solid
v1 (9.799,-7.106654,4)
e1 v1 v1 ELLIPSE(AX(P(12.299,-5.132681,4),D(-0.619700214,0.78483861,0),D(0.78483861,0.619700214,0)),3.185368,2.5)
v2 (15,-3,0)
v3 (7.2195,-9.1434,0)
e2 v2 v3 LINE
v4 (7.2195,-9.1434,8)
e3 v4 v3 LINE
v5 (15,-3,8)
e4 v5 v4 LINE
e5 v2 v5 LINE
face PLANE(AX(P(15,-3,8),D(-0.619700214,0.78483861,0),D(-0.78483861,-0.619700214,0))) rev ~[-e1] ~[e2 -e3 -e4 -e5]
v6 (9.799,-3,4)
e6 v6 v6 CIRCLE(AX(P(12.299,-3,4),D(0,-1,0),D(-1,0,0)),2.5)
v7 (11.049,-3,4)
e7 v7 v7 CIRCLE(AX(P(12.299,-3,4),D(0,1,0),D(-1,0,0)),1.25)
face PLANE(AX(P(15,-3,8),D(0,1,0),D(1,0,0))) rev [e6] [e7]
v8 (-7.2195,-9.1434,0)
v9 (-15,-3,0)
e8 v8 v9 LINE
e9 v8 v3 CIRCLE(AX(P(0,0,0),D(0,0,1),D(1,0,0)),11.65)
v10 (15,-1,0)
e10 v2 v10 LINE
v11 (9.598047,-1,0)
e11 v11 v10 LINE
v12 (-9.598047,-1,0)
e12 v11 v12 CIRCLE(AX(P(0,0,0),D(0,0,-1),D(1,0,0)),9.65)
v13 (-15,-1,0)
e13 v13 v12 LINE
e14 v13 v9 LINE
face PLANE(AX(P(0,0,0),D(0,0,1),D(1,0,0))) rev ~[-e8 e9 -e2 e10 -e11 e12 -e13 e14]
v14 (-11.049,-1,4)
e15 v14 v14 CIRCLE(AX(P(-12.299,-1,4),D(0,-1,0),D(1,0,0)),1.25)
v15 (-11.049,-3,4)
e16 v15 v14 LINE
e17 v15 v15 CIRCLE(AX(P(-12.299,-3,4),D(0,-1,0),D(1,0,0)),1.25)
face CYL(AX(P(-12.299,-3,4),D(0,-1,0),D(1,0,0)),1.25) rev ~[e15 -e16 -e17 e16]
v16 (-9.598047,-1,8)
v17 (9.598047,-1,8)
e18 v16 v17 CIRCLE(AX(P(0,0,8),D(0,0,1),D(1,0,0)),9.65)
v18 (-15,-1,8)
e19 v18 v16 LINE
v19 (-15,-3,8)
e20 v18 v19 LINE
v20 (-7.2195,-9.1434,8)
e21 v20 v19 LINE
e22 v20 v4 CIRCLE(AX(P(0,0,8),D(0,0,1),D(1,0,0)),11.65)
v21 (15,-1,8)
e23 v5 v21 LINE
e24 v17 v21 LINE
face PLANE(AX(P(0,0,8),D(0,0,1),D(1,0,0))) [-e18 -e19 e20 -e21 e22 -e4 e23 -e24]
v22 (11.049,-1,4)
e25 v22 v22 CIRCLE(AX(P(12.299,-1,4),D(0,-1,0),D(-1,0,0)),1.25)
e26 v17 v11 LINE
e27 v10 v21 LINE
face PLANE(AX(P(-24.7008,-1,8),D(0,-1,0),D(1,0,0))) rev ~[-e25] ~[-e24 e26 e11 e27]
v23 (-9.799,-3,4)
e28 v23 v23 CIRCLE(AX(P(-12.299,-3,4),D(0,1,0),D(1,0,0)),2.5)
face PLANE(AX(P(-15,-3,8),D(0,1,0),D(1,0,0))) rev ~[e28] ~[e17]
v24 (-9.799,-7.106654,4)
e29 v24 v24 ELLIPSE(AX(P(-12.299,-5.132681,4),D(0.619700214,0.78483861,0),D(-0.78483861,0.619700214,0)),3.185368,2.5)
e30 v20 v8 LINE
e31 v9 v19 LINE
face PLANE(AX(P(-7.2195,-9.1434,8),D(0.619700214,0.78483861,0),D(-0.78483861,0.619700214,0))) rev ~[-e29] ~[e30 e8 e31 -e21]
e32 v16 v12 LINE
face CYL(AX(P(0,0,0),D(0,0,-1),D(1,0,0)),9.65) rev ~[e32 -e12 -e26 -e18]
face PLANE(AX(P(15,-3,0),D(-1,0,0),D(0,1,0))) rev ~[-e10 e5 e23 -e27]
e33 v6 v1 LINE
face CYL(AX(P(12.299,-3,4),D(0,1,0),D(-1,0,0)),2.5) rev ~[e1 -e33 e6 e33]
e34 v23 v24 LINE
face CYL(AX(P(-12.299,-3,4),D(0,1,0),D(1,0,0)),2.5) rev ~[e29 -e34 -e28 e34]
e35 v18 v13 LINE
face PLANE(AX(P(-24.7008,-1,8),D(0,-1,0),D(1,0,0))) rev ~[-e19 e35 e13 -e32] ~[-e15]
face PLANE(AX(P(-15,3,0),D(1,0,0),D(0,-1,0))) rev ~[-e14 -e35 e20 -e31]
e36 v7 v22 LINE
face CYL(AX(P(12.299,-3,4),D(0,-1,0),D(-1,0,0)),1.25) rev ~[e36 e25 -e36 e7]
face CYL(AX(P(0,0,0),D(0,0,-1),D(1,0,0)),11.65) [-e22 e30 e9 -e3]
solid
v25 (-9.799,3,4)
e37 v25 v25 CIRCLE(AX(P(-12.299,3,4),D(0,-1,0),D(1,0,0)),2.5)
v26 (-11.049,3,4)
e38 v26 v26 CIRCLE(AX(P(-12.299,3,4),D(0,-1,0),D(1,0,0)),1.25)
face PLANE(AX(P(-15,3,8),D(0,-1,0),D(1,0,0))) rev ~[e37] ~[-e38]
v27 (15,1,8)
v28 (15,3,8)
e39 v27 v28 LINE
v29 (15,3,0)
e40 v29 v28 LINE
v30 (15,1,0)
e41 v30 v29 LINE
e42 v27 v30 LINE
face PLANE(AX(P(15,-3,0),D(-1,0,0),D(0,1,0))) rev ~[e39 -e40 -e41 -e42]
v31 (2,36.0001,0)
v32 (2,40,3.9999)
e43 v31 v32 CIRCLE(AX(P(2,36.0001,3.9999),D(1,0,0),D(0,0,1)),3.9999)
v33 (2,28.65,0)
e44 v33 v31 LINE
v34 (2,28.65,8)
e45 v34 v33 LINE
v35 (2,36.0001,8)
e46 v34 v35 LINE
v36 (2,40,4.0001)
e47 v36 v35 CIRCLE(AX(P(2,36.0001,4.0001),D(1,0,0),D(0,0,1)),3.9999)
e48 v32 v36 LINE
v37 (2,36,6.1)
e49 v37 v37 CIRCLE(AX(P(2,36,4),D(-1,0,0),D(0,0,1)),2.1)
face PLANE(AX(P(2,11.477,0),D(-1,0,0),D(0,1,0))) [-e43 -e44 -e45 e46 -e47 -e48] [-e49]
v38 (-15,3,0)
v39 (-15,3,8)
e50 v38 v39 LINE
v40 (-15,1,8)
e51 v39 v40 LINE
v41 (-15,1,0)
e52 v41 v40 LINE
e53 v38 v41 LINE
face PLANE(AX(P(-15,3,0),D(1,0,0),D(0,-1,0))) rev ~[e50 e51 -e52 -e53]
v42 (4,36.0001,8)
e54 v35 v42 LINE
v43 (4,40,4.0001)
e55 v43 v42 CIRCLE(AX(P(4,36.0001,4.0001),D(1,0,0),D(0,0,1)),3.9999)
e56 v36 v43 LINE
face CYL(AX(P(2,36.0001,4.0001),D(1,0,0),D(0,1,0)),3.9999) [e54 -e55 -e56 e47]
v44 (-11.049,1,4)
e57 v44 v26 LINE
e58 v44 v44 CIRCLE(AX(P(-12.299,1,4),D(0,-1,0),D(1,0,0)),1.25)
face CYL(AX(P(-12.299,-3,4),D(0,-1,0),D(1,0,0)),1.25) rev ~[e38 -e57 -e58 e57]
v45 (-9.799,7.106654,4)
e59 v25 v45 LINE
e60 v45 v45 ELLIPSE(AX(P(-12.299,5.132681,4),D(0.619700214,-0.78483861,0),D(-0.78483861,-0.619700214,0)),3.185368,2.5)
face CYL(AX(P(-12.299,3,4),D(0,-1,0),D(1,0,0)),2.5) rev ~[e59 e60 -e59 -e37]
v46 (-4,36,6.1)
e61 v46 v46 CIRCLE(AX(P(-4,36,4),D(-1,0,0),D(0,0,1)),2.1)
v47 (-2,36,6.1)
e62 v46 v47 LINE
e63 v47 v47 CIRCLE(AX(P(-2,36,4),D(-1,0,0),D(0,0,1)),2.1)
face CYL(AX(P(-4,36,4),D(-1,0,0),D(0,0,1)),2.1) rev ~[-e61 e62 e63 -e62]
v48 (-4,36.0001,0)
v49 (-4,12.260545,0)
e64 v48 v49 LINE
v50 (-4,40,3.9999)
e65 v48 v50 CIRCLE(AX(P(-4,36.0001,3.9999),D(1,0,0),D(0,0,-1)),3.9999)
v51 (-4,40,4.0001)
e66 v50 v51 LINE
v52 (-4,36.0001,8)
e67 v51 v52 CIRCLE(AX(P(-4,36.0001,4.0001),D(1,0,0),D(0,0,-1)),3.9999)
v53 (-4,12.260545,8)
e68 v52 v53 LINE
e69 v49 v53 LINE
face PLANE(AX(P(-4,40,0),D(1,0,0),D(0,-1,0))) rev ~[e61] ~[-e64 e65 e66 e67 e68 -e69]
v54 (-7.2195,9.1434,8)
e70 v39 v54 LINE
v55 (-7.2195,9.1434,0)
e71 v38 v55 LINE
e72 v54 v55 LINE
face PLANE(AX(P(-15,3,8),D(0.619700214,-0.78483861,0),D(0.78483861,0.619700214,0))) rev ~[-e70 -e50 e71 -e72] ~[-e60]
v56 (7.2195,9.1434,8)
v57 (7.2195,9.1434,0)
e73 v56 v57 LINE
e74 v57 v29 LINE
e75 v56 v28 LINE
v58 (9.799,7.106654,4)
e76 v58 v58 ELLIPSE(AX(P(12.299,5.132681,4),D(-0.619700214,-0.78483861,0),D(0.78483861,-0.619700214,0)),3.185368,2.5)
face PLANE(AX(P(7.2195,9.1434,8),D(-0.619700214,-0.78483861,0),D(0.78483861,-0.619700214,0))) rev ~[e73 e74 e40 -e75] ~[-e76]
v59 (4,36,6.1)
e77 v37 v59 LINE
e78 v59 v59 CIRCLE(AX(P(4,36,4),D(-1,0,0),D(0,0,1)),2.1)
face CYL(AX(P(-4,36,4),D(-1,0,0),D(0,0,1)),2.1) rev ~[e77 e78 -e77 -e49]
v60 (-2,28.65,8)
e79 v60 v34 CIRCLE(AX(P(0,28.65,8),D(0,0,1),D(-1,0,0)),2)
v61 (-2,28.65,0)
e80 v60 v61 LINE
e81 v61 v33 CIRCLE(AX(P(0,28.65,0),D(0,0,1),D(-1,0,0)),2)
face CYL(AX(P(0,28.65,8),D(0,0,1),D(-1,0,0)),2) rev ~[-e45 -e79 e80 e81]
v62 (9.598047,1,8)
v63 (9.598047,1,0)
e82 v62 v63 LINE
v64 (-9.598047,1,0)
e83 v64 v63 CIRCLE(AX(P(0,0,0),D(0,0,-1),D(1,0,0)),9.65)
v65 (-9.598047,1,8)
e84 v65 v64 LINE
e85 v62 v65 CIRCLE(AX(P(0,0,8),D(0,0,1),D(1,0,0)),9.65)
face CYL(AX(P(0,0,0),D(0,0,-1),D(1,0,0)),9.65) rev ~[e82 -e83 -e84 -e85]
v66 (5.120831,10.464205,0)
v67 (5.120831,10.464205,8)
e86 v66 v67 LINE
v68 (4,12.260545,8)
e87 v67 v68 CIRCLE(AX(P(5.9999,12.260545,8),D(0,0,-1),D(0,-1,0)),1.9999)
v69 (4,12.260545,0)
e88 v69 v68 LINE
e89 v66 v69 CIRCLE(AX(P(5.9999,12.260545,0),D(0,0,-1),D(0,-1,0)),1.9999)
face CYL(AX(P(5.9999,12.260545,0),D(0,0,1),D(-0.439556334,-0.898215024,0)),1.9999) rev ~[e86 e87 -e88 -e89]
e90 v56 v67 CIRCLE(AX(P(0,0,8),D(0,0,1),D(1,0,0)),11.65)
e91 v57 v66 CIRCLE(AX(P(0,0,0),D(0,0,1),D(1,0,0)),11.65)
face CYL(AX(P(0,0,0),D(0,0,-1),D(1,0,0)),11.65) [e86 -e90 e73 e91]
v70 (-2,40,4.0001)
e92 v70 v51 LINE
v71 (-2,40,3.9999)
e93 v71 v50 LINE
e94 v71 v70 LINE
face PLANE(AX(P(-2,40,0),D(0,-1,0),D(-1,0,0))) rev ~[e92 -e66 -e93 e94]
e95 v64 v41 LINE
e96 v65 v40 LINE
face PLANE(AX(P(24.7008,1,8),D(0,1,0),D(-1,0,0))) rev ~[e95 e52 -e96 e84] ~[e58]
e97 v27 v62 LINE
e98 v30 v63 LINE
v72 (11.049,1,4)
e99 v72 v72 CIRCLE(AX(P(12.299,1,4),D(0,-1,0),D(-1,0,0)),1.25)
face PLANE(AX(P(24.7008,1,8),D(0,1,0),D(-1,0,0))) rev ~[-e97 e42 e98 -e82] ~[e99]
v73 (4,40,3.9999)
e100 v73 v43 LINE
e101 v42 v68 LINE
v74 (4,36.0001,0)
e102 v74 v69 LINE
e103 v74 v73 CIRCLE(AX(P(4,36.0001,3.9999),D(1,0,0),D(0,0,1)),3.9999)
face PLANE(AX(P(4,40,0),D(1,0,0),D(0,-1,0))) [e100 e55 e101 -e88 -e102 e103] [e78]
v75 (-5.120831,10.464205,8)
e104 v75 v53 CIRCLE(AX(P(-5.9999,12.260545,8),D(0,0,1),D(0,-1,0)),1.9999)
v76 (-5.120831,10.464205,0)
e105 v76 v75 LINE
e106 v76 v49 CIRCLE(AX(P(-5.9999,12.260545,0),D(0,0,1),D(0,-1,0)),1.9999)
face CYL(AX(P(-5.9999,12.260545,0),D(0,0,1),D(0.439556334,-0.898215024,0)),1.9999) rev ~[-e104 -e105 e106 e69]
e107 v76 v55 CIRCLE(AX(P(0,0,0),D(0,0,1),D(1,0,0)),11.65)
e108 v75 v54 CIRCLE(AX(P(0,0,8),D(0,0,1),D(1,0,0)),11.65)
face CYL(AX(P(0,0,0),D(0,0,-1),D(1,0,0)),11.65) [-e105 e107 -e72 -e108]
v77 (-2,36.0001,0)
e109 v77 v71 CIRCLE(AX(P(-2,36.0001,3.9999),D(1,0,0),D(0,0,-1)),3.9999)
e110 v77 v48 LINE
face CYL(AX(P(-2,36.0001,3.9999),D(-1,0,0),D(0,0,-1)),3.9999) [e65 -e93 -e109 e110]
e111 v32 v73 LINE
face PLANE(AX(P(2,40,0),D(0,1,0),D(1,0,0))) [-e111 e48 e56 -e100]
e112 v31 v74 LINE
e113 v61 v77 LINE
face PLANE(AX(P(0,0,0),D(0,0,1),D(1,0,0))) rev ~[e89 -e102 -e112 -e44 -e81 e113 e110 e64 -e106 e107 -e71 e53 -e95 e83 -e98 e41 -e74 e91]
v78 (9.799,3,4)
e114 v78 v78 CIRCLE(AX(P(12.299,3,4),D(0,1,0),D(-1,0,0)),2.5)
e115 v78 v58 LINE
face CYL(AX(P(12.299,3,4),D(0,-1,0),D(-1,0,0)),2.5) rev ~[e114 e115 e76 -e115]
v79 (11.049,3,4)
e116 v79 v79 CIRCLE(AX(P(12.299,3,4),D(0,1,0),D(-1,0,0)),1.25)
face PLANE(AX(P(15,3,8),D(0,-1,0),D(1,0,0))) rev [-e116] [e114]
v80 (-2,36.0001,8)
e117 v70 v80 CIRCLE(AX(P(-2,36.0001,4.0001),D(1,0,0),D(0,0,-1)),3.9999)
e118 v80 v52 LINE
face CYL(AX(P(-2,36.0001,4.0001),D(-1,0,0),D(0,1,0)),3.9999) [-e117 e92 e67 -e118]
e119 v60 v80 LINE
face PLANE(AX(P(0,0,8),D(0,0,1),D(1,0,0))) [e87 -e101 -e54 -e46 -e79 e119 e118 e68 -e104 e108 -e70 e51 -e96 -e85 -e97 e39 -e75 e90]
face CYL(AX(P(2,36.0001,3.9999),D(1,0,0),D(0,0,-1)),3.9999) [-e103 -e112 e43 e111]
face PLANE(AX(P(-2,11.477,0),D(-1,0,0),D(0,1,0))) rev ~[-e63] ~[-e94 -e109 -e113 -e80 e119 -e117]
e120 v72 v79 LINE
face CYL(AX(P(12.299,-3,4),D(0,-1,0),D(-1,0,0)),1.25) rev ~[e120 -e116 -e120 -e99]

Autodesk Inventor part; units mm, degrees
ref_plane "YZ Plane" through (0, 0, 0) normal (1, 0, 0) x (0, 1, 0)
sketch "Sketch1" plane through (0, 0, 0) normal (0, 0, 1) x (1, 0, 0)
  circle A0 centre (0, 0) radius 9.65
  circle A1 centre (0, 0) radius 11.65
  line L0 (15, -3) -> (15, 3)
  line L1 (-15, 3) -> (-15, -3)
  line L2 (-15, -3) -> (15, 3) construction
  line L3 (15, -3) -> (-15, 3) construction
  line L4 (-15, -3) -> (-9.1718, -3)
  line L5 (9.1718, -3) -> (15, -3)
  line L6 (15, 3) -> (9.1718, 3)
  line L7 (-9.1718, 3) -> (-15, 3)
  dimension "d0" = 19.3
  dimension "d1" = 2
  dimension "d2" = 30
  dimension "d3" = 6
extrude "Extrusion1" add sketch "Sketch1" along normal blind 8 contours A0 L6 A1 L5 | A0 L7 A1 L6 | L5 A1 L4 A0 | A0 L4 A1 L7 | L6 L0 L5 A1 | A1 L4 L1 L7
sketch "Sketch2" plane through (0, 0, 8) normal (0, 0, 1) x (1, 0, 0)
  line L0 (-15, 3) -> (-15, -3) projected
  line L1 (-15, 3) -> (-7.2195, 9.1434)
  line L2 (15, 3) -> (11.2571, 3) projected
  line L3 (7.2195, 9.1434) -> (15, 3)
  line L4 (-15, -3) -> (-11.2571, -3) projected
  line L5 (-7.2195, -9.1434) -> (-15, -3)
  arc A0 (11.2571, 3) -> (-11.2571, 3) centre (0, 0) ccw projected
  arc A1 (-11.2571, -3) -> (11.2571, -3) centre (0, 0) ccw projected
  line L6 (11.2571, -3) -> (15, -3) projected
  line L7 (15, -3) -> (7.2195, -9.1434)
  line L8 (-11.2571, 3) -> (-15, 3) projected
extrude "Extrusion2" add sketch "Sketch2" against normal blind 8
sketch "Sketch3" plane through (0, 0, 8) normal (0, 0, 1) x (1, 0, 0)
  line L0 (-24.7008, -1) -> (24.7008, -1)
  line L1 (24.7008, -1) -> (24.7008, 1)
  line L2 (24.7008, 1) -> (-24.7008, 1)
  line L3 (-24.7008, 1) -> (-24.7008, -1)
  line L4 (-24.7008, -1) -> (24.7008, 1) construction
  line L5 (24.7008, -1) -> (-24.7008, 1) construction
  point P0 (0, 0)
  dimension "d8" = 2
extrude "Extrusion3" cut sketch "Sketch3" against normal through all
sketch "Sketch4" plane through (0, 0, 0) normal (0, 0, -1) x (-1, 0, 0)
  line L0 (-4, 0) -> (-2, 0)
  line L1 (-2, 11.477) -> (-2, 40)
  line L2 (-2, 40) -> (-4, 40)
  line L3 (-4, 40) -> (-4, 10.9418)
  line L4 (2, 40) -> (4, 40)
  line L5 (4, 40) -> (4, 10.9418)
  line L6 (4, 0) -> (2, 0)
  line L7 (2, 11.477) -> (2, 40)
  arc A0 (7.2195, 9.1434) -> (-7.2195, 9.1434) centre (0, 0) ccw projected
  point P0 (-3, 0)
  dimension "d11" = 2
  dimension "d12" = 2
  dimension "d13" = 4
  dimension "d14" = 2
  dimension "d15" = 40
extrude "Extrusion4" add sketch "Sketch4" against normal blind 8
fillet "Fillet1" radius 2 4 edges at (-4, 10.9418, 4) (-2, 11.477, 4) (2, 11.477, 4) (4, 10.9418, 4)
fillet "Fillet2" radius 4 4 edges at (-3, 40, 0) (3, 40, 0) (3, 40, 8) (-3, 40, 8)
ref_plane "Work Plane1" through (-15, -3, 8) normal (0, 1, 0) x (1, 0, 0)
sketch "Sketch5" plane through (-15, -3, 8) normal (0, 1, 0) x (1, 0, 0)
  line L0 (0, 8) -> (5.402, 8) projected
  line L1 (0, 0) -> (0, 8) projected
  circle A0 centre (2.701, 4) radius 2.5
  point P0 (15, 8)
  dimension "d21" = 5
extrude "Extrusion5" cut sketch "Sketch5" against normal blind 8
sketch "Sketch6" plane through (-12.299, -3, 4) normal (0, -1, 0) x (1, 0, 0)
  circle A0 centre (0, 0) radius 1.25
  point P0 (12.299, -4)
  dimension "d24" = 2.5
extrude "Extrusion6" cut sketch "Sketch6" against normal blind 12
ref_plane "Work Plane2" through (-15, 3, 8) normal (0, -1, 0) x (1, 0, 0)
sketch "Sketch7" plane through (-15, 3, 8) normal (0, -1, 0) x (1, 0, 0)
  circle A0 centre (2.701, -4) radius 1.25 projected
  circle A1 centre (2.701, -4) radius 2.5 projected
  point P0 (15, -8)
extrude "Extrusion7" cut sketch "Sketch7" against normal blind 12
mirror "Mirror1" about plane through (0, 0, 0) normal (1, 0, 0) of "Extrusion7", "Extrusion6", "Extrusion5"
sketch "Sketch8" plane through (-4, 12.2606, 0) normal (-1, 0, 0) x (0, 0, 1)
  arc A0 (8, 23.7394) -> (0, 23.7394) centre (4, 23.7394) ccw projected
  line L0 (0, 0) -> (0, 23.7394) projected
  line L1 (8, 0) -> (0, 0) projected
  line L2 (8, 23.7394) -> (8, 0) projected
  circle A1 centre (4, 23.7394) radius 2.1
  point P0 (0, -12.2606)
  dimension "d30" = 4.2
extrude "Extrusion8" cut sketch "Sketch8" against normal through all contours A1
sketch "Sketch9" plane through (0, 0, 8) normal (0, 0, 1) x (1, 0, 0)
  line L0 (-4, 36) -> (-2, 36) projected
  line L1 (-4, 36) -> (-4, 12.2606) projected
  arc A0 (-5.1209, 10.4642) -> (-4, 12.2606) centre (-6, 12.2606) ccw projected
  arc A1 (-5.1209, 10.4642) -> (-7.2195, 9.1434) centre (0, 0) ccw projected
  line L2 (-7.2195, 9.1434) -> (-15, 3) projected
  line L3 (-15, 3) -> (-15, 1) projected
  line L4 (-15, 1) -> (-9.598, 1) projected
  arc A2 (9.598, 1) -> (-9.598, 1) centre (0, 0) ccw projected
  line L5 (9.598, 1) -> (15, 1) projected
  line L6 (15, 1) -> (15, 3) projected
  line L7 (15, 3) -> (7.2195, 9.1434) projected
  arc A3 (7.2195, 9.1434) -> (5.1209, 10.4642) centre (0, 0) ccw projected
  arc A4 (4, 12.2606) -> (5.1209, 10.4642) centre (6, 12.2606) ccw projected
  line L8 (4, 12.2606) -> (4, 36) projected
  line L9 (2, 36) -> (4, 36) projected
  line L10 (2, 36) -> (2, 13.65) projected
  arc A5 (-2, 13.65) -> (2, 13.65) centre (0, 13.65) ccw projected
  line L11 (-2, 13.65) -> (-2, 36) projected
  arc A6 (-2, 28.65) -> (2, 28.65) centre (0, 28.65) ccw
  line L12 (2, 36) -> (2, 13.65) projected
  dimension "d33" = 15
extrude "Extrusion9" add sketch "Sketch9" against normal blind 8 contours A6 L10 A5 L11
properties part number "Potentiometer arm"
